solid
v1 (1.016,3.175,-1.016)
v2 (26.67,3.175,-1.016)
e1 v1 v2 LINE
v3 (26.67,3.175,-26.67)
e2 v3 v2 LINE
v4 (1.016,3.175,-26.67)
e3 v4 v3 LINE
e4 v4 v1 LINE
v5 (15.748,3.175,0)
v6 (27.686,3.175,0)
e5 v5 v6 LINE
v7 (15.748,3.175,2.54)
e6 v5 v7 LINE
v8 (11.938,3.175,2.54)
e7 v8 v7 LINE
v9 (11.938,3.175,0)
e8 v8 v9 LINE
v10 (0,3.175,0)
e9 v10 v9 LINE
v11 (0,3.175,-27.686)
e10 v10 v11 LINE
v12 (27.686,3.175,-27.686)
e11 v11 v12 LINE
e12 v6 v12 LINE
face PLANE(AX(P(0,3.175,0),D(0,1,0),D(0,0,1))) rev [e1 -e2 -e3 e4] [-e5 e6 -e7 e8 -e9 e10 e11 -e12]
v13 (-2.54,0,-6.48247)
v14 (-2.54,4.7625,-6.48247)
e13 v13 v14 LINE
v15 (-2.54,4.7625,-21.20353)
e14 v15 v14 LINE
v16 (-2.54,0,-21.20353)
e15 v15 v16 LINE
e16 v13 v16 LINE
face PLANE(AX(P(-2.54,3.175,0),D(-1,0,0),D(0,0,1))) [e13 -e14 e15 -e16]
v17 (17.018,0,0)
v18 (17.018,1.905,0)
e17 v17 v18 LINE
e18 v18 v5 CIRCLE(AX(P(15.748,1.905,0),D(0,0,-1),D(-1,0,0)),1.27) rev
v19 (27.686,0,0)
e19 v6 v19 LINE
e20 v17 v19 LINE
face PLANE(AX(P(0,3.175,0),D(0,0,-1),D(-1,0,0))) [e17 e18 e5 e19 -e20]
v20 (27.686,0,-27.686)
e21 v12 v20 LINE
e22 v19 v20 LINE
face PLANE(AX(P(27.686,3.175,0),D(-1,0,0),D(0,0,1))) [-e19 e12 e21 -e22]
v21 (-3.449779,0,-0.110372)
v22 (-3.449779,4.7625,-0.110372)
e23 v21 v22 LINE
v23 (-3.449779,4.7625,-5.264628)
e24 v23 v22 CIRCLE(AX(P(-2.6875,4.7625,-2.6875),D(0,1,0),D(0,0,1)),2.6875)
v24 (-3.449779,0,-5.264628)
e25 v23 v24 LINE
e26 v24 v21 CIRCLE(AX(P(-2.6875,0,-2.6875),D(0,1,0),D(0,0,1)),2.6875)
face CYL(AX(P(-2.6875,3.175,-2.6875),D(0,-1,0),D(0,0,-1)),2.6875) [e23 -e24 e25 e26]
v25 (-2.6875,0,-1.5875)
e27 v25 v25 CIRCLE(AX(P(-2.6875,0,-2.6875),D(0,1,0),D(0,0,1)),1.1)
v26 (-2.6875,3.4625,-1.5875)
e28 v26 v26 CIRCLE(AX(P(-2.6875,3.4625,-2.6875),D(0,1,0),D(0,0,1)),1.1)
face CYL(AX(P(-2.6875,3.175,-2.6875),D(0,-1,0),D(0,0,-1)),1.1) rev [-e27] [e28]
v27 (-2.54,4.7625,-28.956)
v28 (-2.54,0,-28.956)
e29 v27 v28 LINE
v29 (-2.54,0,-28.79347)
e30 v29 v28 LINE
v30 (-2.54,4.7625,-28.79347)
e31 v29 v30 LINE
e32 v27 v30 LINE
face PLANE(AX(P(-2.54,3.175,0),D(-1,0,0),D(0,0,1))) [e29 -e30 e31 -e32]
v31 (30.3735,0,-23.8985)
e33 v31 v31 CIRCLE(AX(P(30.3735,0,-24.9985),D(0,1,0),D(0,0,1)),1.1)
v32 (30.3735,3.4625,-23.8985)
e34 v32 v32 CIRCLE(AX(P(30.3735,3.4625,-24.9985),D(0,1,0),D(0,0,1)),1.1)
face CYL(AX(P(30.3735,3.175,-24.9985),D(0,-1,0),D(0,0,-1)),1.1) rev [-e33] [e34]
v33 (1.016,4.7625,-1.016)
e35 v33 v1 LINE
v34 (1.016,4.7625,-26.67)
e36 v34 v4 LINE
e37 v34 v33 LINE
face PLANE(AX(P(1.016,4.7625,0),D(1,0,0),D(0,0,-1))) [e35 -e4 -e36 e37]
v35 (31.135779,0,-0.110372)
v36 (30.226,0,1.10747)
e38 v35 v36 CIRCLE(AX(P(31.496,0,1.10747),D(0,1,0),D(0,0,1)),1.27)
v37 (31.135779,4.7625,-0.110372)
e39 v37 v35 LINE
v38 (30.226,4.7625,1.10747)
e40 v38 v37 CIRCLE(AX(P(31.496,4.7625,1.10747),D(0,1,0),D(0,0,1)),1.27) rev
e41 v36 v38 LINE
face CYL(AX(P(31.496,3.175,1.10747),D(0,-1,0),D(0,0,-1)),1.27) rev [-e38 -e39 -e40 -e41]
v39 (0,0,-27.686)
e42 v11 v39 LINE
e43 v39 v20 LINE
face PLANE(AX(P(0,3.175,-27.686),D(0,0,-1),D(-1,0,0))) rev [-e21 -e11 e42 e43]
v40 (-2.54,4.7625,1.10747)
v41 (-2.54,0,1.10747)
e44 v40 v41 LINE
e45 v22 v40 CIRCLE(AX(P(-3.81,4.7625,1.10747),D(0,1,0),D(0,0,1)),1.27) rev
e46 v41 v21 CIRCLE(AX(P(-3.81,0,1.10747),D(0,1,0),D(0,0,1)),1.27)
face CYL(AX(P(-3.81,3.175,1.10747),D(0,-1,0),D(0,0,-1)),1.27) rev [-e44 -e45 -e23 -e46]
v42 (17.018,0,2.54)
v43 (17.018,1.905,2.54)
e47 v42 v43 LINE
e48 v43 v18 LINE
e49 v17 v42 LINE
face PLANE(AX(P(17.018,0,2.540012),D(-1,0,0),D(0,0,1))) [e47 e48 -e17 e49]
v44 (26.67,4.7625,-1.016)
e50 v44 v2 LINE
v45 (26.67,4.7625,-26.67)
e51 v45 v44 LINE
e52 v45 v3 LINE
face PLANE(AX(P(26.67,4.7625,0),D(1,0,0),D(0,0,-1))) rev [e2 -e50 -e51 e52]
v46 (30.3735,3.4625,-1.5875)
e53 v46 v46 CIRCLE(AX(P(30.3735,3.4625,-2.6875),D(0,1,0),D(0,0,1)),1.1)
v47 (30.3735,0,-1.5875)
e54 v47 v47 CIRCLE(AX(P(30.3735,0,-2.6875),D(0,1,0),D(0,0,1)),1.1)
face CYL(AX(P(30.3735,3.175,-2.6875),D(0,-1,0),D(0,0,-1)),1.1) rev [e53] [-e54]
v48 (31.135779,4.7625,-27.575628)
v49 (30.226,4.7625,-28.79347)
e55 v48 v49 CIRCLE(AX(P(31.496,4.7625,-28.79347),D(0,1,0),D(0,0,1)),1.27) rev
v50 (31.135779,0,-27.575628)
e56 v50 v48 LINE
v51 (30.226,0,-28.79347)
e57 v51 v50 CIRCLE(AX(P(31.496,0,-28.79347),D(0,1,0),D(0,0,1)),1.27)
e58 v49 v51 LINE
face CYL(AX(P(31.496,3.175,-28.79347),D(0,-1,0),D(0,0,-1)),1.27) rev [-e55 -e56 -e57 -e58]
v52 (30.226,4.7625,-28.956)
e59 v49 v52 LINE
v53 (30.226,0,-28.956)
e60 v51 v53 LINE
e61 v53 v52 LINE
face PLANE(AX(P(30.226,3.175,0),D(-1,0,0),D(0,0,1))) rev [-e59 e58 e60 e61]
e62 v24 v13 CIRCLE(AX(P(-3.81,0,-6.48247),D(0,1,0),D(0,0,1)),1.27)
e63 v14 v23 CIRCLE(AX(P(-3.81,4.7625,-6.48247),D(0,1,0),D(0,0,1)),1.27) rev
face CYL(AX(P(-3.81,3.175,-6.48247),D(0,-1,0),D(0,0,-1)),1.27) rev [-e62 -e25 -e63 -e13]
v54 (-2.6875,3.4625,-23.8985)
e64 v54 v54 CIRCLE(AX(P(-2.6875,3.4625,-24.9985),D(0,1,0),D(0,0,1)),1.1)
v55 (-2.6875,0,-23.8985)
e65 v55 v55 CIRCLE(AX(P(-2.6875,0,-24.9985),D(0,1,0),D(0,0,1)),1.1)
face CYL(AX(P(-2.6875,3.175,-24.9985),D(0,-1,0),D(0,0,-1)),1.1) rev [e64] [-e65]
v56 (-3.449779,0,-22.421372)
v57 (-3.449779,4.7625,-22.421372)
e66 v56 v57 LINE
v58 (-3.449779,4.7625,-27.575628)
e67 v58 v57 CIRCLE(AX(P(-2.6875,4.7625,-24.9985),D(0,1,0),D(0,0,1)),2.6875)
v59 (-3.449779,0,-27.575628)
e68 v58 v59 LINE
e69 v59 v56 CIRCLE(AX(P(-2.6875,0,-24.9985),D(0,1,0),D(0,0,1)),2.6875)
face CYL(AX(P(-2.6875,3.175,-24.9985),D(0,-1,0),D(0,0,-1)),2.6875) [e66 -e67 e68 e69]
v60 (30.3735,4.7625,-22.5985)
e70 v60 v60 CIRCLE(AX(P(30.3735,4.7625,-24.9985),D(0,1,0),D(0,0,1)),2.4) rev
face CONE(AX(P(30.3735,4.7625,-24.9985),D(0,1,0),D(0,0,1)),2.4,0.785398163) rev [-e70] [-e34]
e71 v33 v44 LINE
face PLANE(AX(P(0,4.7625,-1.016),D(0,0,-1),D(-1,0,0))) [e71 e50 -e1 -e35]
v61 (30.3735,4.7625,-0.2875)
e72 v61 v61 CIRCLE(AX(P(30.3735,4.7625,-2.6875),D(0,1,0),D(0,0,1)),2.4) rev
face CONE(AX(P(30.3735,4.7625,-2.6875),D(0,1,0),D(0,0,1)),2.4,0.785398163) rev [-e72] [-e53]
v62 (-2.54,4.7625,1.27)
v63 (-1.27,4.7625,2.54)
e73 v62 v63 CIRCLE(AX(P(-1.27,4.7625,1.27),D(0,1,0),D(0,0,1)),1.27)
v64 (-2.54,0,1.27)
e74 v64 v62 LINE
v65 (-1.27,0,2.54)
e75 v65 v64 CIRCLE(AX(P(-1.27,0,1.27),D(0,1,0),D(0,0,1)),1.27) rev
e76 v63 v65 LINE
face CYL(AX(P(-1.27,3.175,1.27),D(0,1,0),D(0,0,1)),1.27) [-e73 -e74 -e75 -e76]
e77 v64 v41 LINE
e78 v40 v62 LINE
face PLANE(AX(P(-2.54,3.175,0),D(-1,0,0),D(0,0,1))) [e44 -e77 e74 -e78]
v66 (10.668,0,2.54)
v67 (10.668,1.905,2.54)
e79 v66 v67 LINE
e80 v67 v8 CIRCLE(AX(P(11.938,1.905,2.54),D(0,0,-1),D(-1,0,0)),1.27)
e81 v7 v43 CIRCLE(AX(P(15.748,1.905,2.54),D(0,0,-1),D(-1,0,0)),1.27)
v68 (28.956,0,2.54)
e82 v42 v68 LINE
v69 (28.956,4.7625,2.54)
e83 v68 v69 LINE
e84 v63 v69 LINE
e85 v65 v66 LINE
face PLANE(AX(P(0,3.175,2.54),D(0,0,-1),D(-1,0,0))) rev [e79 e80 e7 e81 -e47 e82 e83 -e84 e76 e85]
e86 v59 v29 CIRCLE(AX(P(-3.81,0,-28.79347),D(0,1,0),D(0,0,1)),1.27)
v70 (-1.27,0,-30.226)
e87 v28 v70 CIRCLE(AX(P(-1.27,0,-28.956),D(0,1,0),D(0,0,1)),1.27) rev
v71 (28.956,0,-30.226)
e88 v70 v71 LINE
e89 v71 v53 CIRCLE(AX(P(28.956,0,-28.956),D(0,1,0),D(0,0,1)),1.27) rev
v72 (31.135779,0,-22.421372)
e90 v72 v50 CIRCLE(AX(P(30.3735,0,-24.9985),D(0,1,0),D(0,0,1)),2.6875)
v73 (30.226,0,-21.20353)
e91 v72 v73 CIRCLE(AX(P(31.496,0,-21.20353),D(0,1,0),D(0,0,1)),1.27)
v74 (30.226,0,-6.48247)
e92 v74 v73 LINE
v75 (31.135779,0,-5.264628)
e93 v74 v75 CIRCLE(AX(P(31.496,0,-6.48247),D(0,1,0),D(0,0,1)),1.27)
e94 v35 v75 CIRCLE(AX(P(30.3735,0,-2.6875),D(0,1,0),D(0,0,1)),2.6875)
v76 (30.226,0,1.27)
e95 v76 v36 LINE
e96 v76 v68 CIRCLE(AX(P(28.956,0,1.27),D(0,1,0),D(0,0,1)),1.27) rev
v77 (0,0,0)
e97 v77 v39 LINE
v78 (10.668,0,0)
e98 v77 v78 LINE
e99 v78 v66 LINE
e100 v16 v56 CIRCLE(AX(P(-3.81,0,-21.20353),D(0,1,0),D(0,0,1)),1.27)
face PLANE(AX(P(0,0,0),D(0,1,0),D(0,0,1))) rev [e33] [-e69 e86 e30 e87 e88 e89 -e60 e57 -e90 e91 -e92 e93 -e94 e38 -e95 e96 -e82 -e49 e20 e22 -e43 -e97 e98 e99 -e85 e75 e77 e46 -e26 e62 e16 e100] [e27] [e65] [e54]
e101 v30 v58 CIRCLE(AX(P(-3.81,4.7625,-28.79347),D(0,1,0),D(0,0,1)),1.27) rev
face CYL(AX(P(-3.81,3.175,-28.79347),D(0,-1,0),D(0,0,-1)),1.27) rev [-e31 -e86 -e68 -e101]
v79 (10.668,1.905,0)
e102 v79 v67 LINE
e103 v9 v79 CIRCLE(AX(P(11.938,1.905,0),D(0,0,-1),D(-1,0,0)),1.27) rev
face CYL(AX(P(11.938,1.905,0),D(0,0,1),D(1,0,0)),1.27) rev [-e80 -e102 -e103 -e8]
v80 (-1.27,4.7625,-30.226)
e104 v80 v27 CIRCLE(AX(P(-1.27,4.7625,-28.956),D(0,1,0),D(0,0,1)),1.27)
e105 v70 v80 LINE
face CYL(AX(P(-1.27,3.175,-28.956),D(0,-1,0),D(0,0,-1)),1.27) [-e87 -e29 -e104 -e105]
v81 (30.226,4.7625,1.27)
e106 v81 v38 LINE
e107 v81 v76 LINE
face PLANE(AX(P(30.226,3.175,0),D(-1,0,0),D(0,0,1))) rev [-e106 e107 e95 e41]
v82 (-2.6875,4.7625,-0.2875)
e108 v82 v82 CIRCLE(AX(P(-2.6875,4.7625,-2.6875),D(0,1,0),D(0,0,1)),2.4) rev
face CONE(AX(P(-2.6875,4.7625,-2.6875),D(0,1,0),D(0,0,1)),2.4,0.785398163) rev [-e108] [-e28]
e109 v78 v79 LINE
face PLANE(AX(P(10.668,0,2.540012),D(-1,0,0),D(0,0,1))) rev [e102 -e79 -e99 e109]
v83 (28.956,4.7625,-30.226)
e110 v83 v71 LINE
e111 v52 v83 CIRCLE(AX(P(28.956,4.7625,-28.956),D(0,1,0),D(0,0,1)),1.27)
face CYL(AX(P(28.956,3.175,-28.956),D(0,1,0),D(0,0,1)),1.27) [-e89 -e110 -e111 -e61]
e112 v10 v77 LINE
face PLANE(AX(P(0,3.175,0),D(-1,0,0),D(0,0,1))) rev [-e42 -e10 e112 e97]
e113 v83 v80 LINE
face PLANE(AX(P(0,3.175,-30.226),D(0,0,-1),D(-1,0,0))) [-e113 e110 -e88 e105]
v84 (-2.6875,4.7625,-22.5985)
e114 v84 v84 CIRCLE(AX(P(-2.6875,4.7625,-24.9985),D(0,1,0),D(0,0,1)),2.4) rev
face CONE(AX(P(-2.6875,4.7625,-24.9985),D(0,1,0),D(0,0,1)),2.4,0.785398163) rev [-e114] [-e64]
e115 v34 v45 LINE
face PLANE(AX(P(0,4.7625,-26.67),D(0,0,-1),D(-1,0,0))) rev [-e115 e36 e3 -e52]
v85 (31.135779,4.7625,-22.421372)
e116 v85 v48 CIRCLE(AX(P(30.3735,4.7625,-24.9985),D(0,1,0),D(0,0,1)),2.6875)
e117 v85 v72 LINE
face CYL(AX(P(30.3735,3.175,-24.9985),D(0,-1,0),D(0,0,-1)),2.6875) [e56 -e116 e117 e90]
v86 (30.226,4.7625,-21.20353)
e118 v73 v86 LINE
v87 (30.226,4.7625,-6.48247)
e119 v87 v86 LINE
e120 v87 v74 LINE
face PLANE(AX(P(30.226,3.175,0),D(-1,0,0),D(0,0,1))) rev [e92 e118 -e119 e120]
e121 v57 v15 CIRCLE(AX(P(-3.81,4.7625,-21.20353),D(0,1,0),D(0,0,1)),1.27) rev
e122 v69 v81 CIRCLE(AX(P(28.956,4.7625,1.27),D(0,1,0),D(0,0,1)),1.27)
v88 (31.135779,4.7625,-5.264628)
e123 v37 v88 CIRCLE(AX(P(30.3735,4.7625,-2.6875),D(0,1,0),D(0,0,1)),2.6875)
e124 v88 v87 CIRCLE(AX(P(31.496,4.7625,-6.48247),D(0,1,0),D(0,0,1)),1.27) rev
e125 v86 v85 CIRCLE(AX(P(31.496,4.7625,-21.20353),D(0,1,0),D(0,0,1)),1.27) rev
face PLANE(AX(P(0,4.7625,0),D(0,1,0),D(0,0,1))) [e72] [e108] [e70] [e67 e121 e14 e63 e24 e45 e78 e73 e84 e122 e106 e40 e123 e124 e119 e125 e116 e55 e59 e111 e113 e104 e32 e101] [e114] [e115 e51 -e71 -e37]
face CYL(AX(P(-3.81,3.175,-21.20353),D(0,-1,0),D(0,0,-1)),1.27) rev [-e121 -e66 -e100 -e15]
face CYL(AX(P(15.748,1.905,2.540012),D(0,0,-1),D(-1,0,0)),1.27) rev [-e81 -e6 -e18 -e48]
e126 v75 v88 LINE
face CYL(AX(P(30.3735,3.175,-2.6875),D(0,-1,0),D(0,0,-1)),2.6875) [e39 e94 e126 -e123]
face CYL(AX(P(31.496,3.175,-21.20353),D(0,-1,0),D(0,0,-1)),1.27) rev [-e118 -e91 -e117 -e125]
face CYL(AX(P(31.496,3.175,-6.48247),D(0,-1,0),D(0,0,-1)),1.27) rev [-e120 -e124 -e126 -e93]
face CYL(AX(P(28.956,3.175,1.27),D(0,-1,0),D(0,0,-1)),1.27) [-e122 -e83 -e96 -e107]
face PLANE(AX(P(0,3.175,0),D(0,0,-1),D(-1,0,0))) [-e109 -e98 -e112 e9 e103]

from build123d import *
from build123d.topology import SkipClean

# Parameters (mm, degrees)
BOSS_EXTRUDE1_DEPTH            = 3.175
SKETCH2_R                      = 1.1
SKETCH2_W                      = 27.686
SKETCH2_H                      = 27.686
SKETCH2_W_2                    = 25.654
SKETCH2_H_2                    = 25.654
BOSS_EXTRUDE2_DEPTH            = 1.5875
CHAMFER1_SIZE                  = 1.3
FILLET1_R                      = 1.27
CUT_EXTRUDE1_REACH             = 48.79
SKETCH3_W                      = 6.35
SKETCH3_H                      = 3.175
CUT_EXTRUDE1_DIRECTION_2_DEPTH = 47.790190032
FILLET2_R                      = 1.27


with BuildPart() as part:
    # Sketch1 → Boss-Extrude1 (new body)
    with BuildSketch(Plane(origin=(0, 0, 0), x_dir=(1, 0, 0), z_dir=(0, 1, 0))):
        with BuildLine():
            ThreePointArc((-2.54, 27.681949273), (-5.375, 24.9985), (-2.54, 22.315050727))
            Line((-2.54, 22.315050727), (-2.54, 23.908434062))
            ThreePointArc((-2.54, 23.908434062), (-3.7875, 24.9985), (-2.54, 26.088565938))
            Line((-2.54, 26.088565938), (-2.54, 27.681949273))
        make_face()
        with BuildLine():
            Line((-2.54, 23.908434062), (-2.54, 22.315050727))
            ThreePointArc((-2.54, 22.315050727), (-0.735697948, 23.151035521), (0, 24.9985))
            ThreePointArc((0, 24.9985), (-0.735697948, 26.845964479), (-2.54, 27.681949273))
            Line((-2.54, 27.681949273), (-2.54, 26.088565938))
            ThreePointArc((-2.54, 26.088565938), (-1.859173374, 25.722292097), (-1.5875, 24.9985))
            ThreePointArc((-1.5875, 24.9985), (-1.859173374, 24.274707903), (-2.54, 23.908434062))
        make_face()
        with BuildLine():
            ThreePointArc((-2.54, 27.681949273), (-0.735697948, 26.845964479), (0, 24.9985))
            Line((0, 24.9985), (0, 27.686))
            Line((0, 27.686), (27.686, 27.686))
            Line((27.686, 27.686), (27.686, 24.9985))
            ThreePointArc((27.686, 24.9985), (28.421697948, 26.845964479), (30.226, 27.681949273))
            Line((30.226, 27.681949273), (30.226, 30.226))
            Line((30.226, 30.226), (-2.54, 30.226))
            Line((-2.54, 30.226), (-2.54, 27.681949273))
        make_face()
        with BuildLine():
            ThreePointArc((-2.54, 27.681949273), (-5.375, 24.9985), (-2.54, 22.315050727))
            Line((-2.54, 22.315050727), (-2.54, 23.908434062))
            ThreePointArc((-2.54, 23.908434062), (-3.7875, 24.9985), (-2.54, 26.088565938))
            Line((-2.54, 26.088565938), (-2.54, 27.681949273))
        make_face()
        with BuildLine():
            Line((-2.54, 23.908434062), (-2.54, 22.315050727))
            ThreePointArc((-2.54, 22.315050727), (-0.735697948, 23.151035521), (0, 24.9985))
            ThreePointArc((0, 24.9985), (-0.735697948, 26.845964479), (-2.54, 27.681949273))
            Line((-2.54, 27.681949273), (-2.54, 26.088565938))
            ThreePointArc((-2.54, 26.088565938), (-1.859173374, 25.722292097), (-1.5875, 24.9985))
            ThreePointArc((-1.5875, 24.9985), (-1.859173374, 24.274707903), (-2.54, 23.908434062))
        make_face()
        with BuildLine():
            ThreePointArc((-2.54, 5.370949273), (-5.375, 2.6875), (-2.54, 0.004050727))
            Line((-2.54, 0.004050727), (-2.54, 1.597434062))
            ThreePointArc((-2.54, 1.597434062), (-3.7875, 2.6875), (-2.54, 3.777565938))
            Line((-2.54, 3.777565938), (-2.54, 5.370949273))
        make_face()
        with BuildLine():
            Line((-2.54, 1.597434062), (-2.54, 0.004050727))
            ThreePointArc((-2.54, 0.004050727), (-0.735697948, 0.840035521), (0, 2.6875))
            ThreePointArc((0, 2.6875), (-0.735697948, 4.534964479), (-2.54, 5.370949273))
            Line((-2.54, 5.370949273), (-2.54, 3.777565938))
            ThreePointArc((-2.54, 3.777565938), (-1.859173374, 3.411292097), (-1.5875, 2.6875))
            ThreePointArc((-1.5875, 2.6875), (-1.859173374, 1.963707903), (-2.54, 1.597434062))
        make_face()
        with BuildLine():
            ThreePointArc((-2.54, 5.370949273), (-5.375, 2.6875), (-2.54, 0.004050727))
            Line((-2.54, 0.004050727), (-2.54, 1.597434062))
            ThreePointArc((-2.54, 1.597434062), (-3.7875, 2.6875), (-2.54, 3.777565938))
            Line((-2.54, 3.777565938), (-2.54, 5.370949273))
        make_face()
        with BuildLine():
            Line((-2.54, 1.597434062), (-2.54, 0.004050727))
            ThreePointArc((-2.54, 0.004050727), (-0.735697948, 0.840035521), (0, 2.6875))
            ThreePointArc((0, 2.6875), (-0.735697948, 4.534964479), (-2.54, 5.370949273))
            Line((-2.54, 5.370949273), (-2.54, 3.777565938))
            ThreePointArc((-2.54, 3.777565938), (-1.859173374, 3.411292097), (-1.5875, 2.6875))
            ThreePointArc((-1.5875, 2.6875), (-1.859173374, 1.963707903), (-2.54, 1.597434062))
        make_face()
        with BuildLine():
            Line((-2.54, 22.315050727), (-2.54, 5.370949273))
            ThreePointArc((-2.54, 5.370949273), (-0.735697948, 4.534964479), (0, 2.6875))
            Line((0, 2.6875), (0, 24.9985))
            ThreePointArc((0, 24.9985), (-0.735697948, 23.151035521), (-2.54, 22.315050727))
        make_face()
        with BuildLine():
            Line((-2.54, 0.004050727), (-2.54, -2.54))
            Line((-2.54, -2.54), (30.226, -2.54))
            Line((30.226, -2.54), (30.226, 0.004050727))
            ThreePointArc((30.226, 0.004050727), (28.421697948, 0.840035521), (27.686, 2.6875))
            Line((27.686, 2.6875), (27.686, 0))
            Line((27.686, 0), (0, 0))
            Line((0, 0), (0, 2.6875))
            ThreePointArc((0, 2.6875), (-0.735697948, 0.840035521), (-2.54, 0.004050727))
        make_face()
        with BuildLine():
            Line((27.686, 24.9985), (27.686, 2.6875))
            ThreePointArc((27.686, 2.6875), (28.421697948, 4.534964479), (30.226, 5.370949273))
            Line((30.226, 5.370949273), (30.226, 22.315050727))
            ThreePointArc((30.226, 22.315050727), (28.421697948, 23.151035521), (27.686, 24.9985))
        make_face()
        with BuildLine():
            ThreePointArc((27.686, 2.6875), (28.421697948, 0.840035521), (30.226, 0.004050727))
            Line((30.226, 0.004050727), (30.226, 1.597434062))
            ThreePointArc((30.226, 1.597434062), (29.2735, 2.6875), (30.226, 3.777565938))
            Line((30.226, 3.777565938), (30.226, 5.370949273))
            ThreePointArc((30.226, 5.370949273), (28.421697948, 4.534964479), (27.686, 2.6875))
        make_face()
        with BuildLine():
            Line((30.226, 1.597434062), (30.226, 0.004050727))
            ThreePointArc((30.226, 0.004050727), (32.220964479, 0.735697948), (33.061, 2.6875))
            ThreePointArc((33.061, 2.6875), (32.220964479, 4.639302052), (30.226, 5.370949273))
            Line((30.226, 5.370949273), (30.226, 3.777565938))
            ThreePointArc((30.226, 3.777565938), (31.097292097, 3.515826626), (31.4735, 2.6875))
            ThreePointArc((31.4735, 2.6875), (31.097292097, 1.859173374), (30.226, 1.597434062))
        make_face()
        with BuildLine():
            ThreePointArc((27.686, 2.6875), (28.421697948, 0.840035521), (30.226, 0.004050727))
            Line((30.226, 0.004050727), (30.226, 1.597434062))
            ThreePointArc((30.226, 1.597434062), (29.2735, 2.6875), (30.226, 3.777565938))
            Line((30.226, 3.777565938), (30.226, 5.370949273))
            ThreePointArc((30.226, 5.370949273), (28.421697948, 4.534964479), (27.686, 2.6875))
        make_face()
        with BuildLine():
            Line((30.226, 1.597434062), (30.226, 0.004050727))
            ThreePointArc((30.226, 0.004050727), (32.220964479, 0.735697948), (33.061, 2.6875))
            ThreePointArc((33.061, 2.6875), (32.220964479, 4.639302052), (30.226, 5.370949273))
            Line((30.226, 5.370949273), (30.226, 3.777565938))
            ThreePointArc((30.226, 3.777565938), (31.097292097, 3.515826626), (31.4735, 2.6875))
            ThreePointArc((31.4735, 2.6875), (31.097292097, 1.859173374), (30.226, 1.597434062))
        make_face()
        with BuildLine():
            ThreePointArc((30.226, 27.681949273), (28.421697948, 26.845964479), (27.686, 24.9985))
            ThreePointArc((27.686, 24.9985), (28.421697948, 23.151035521), (30.226, 22.315050727))
            Line((30.226, 22.315050727), (30.226, 23.908434062))
            ThreePointArc((30.226, 23.908434062), (29.2735, 24.9985), (30.226, 26.088565938))
            Line((30.226, 26.088565938), (30.226, 27.681949273))
        make_face()
        with BuildLine():
            ThreePointArc((33.061, 24.9985), (32.220964479, 26.950302052), (30.226, 27.681949273))
            Line((30.226, 27.681949273), (30.226, 26.088565938))
            ThreePointArc((30.226, 26.088565938), (31.097292097, 25.826826626), (31.4735, 24.9985))
            ThreePointArc((31.4735, 24.9985), (31.097292097, 24.170173374), (30.226, 23.908434062))
            Line((30.226, 23.908434062), (30.226, 22.315050727))
            ThreePointArc((30.226, 22.315050727), (32.220964479, 23.046697948), (33.061, 24.9985))
        make_face()
        with BuildLine():
            ThreePointArc((30.226, 27.681949273), (28.421697948, 26.845964479), (27.686, 24.9985))
            ThreePointArc((27.686, 24.9985), (28.421697948, 23.151035521), (30.226, 22.315050727))
            Line((30.226, 22.315050727), (30.226, 23.908434062))
            ThreePointArc((30.226, 23.908434062), (29.2735, 24.9985), (30.226, 26.088565938))
            Line((30.226, 26.088565938), (30.226, 27.681949273))
        make_face()
        with BuildLine():
            ThreePointArc((33.061, 24.9985), (32.220964479, 26.950302052), (30.226, 27.681949273))
            Line((30.226, 27.681949273), (30.226, 26.088565938))
            ThreePointArc((30.226, 26.088565938), (31.097292097, 25.826826626), (31.4735, 24.9985))
            ThreePointArc((31.4735, 24.9985), (31.097292097, 24.170173374), (30.226, 23.908434062))
            Line((30.226, 23.908434062), (30.226, 22.315050727))
            ThreePointArc((30.226, 22.315050727), (32.220964479, 23.046697948), (33.061, 24.9985))
        make_face()
    extrude(amount=BOSS_EXTRUDE1_DEPTH)

    # Sketch2 → Boss-Extrude2 (add)
    # profile 1 of 2: a face of its own
    with SkipClean():  # the faces are left unmerged after this step: merging them gives an invalid solid
        with BuildSketch(Plane(origin=(0, 3.175, 0), x_dir=(1, 0, 0), z_dir=(0, 1, 0))):
            with BuildLine():
                Line((30.226, -2.54), (30.226, 0.004050727))
                ThreePointArc((30.226, 0.004050727), (33.061, 2.6875), (30.226, 5.370949273))
                Line((30.226, 5.370949273), (30.226, 22.315050727))
                ThreePointArc((30.226, 22.315050727), (33.061, 24.9985), (30.226, 27.681949273))
                Line((30.226, 27.681949273), (30.226, 30.226))
                Line((30.226, 30.226), (-2.54, 30.226))
                Line((-2.54, 30.226), (-2.54, 27.681949273))
                ThreePointArc((-2.54, 27.681949273), (-5.375, 24.9985), (-2.54, 22.315050727))
                Line((-2.54, 22.315050727), (-2.54, 5.370949273))
                ThreePointArc((-2.54, 5.370949273), (-5.375, 2.6875), (-2.54, 0.004050727))
                Line((-2.54, 0.004050727), (-2.54, -2.54))
                Line((-2.54, -2.54), (30.226, -2.54))
            make_face()
            with Locations(Location((30.3735, 2.6875, 0), (0, 0, 270))):
                Circle(SKETCH2_R, mode=Mode.SUBTRACT)
            with Locations(Location((30.3735, 24.9985, 0), (0, 0, 270))):
                Circle(SKETCH2_R, mode=Mode.SUBTRACT)
            with Locations(Location((-2.6875, 24.9985, 0), (0, 0, 270))):
                Circle(SKETCH2_R, mode=Mode.SUBTRACT)
            with Locations(Location((-2.6875, 2.6875, 0), (0, 0, 270))):
                Circle(SKETCH2_R, mode=Mode.SUBTRACT)
            with Locations((13.843, 13.843)):
                Rectangle(SKETCH2_W, SKETCH2_H, mode=Mode.SUBTRACT)
        # profile 2 of 2: a face of its own
        with BuildSketch(Plane(origin=(0, 3.175, 0), x_dir=(1, 0, 0), z_dir=(0, 1, 0))):
            with Locations((13.843, 13.843)):
                Rectangle(SKETCH2_W, SKETCH2_H)
            with Locations((13.843, 13.843)):
                Rectangle(SKETCH2_W_2, SKETCH2_H_2, mode=Mode.SUBTRACT)
        extrude(amount=BOSS_EXTRUDE2_DEPTH)

    # Chamfer1
    chamfer1_edges = [part.edges().sort_by_distance(p)[0] for p in [
        (30.3735, 4.7625, -3.7875),
        (30.3735, 4.7625, -26.0985),
        (-2.6875, 4.7625, -26.0985),
        (-2.6875, 4.7625, -3.7875),
    ]]
    chamfer(chamfer1_edges, length=CHAMFER1_SIZE)

    # Fillet1
    fillet1_edges = [part.edges().sort_by_distance(p)[0] for p in [
        (30.226, 1.5875, -0.004050727),
        (30.226, 1.5875, 2.54),
        (-2.54, 1.5875, 2.54),
        (-2.54, 1.5875, -0.004050727),
        (-2.54, 1.5875, -5.370949273),
        (-2.54, 1.5875, -22.315050727),
        (-2.54, 1.5875, -27.681949273),
        (-2.54, 1.5875, -30.226),
        (30.226, 1.5875, -30.226),
        (30.226, 1.5875, -27.681949273),
        (30.226, 1.5875, -22.315050727),
        (30.226, 1.5875, -5.370949273),
    ]]
    fillet(fillet1_edges, radius=FILLET1_R)

    # Sketch3 → Cut-Extrude1 (cut, up to next)
    with BuildSketch(Plane.XY.offset(2.54), mode=Mode.PRIVATE) as cut_extrude1_sk1:
        with Locations((13.843, 1.5875)):
            Rectangle(SKETCH3_W, SKETCH3_H)
    cut_extrude1_tool1 = extrude(cut_extrude1_sk1.sketch, amount=-CUT_EXTRUDE1_REACH, mode=Mode.PRIVATE) & part.part
    add(cut_extrude1_tool1.solids().sort_by_distance((13.843, 1.5875, 2.54))[0], mode=Mode.SUBTRACT)

    # Sketch3 → Cut-Extrude1 direction 2 (cut)
    with SkipClean():  # the faces are left unmerged after this step: merging them gives an invalid solid
        with BuildSketch(Plane.XY.offset(2.54)):
            with Locations((13.843, 1.5875)):
                Rectangle(SKETCH3_W, SKETCH3_H)
        extrude(amount=CUT_EXTRUDE1_DIRECTION_2_DEPTH, mode=Mode.SUBTRACT)

    # Fillet2
    # the kernel refuses this fillet: 1.27 mm, written as the material it adds along each edge
    with BuildSketch(Plane(origin=(17.018, 3.175, 2.54), x_dir=(-1, 0, 0), z_dir=(0, 0, -1))) as fillet2_piece_1:
        with BuildLine():
            CenterArc((FILLET2_R, -FILLET2_R), FILLET2_R, 90, 90)
            Line((0, -FILLET2_R), (0, 0))
            Line((0, 0), (FILLET2_R, 0))
        make_face()
    extrude(amount=2.54)
    with BuildSketch(Plane(origin=(10.668, 3.175, 2.54), x_dir=(1, 0, 0), z_dir=(0, 0, -1))) as fillet2_piece_2:
        with BuildLine():
            CenterArc((FILLET2_R, FILLET2_R), FILLET2_R, 180, 90)
            Line((0, FILLET2_R), (0, 0))
            Line((0, 0), (FILLET2_R, 0))
        make_face()
    extrude(amount=2.54)


solid = part.part
